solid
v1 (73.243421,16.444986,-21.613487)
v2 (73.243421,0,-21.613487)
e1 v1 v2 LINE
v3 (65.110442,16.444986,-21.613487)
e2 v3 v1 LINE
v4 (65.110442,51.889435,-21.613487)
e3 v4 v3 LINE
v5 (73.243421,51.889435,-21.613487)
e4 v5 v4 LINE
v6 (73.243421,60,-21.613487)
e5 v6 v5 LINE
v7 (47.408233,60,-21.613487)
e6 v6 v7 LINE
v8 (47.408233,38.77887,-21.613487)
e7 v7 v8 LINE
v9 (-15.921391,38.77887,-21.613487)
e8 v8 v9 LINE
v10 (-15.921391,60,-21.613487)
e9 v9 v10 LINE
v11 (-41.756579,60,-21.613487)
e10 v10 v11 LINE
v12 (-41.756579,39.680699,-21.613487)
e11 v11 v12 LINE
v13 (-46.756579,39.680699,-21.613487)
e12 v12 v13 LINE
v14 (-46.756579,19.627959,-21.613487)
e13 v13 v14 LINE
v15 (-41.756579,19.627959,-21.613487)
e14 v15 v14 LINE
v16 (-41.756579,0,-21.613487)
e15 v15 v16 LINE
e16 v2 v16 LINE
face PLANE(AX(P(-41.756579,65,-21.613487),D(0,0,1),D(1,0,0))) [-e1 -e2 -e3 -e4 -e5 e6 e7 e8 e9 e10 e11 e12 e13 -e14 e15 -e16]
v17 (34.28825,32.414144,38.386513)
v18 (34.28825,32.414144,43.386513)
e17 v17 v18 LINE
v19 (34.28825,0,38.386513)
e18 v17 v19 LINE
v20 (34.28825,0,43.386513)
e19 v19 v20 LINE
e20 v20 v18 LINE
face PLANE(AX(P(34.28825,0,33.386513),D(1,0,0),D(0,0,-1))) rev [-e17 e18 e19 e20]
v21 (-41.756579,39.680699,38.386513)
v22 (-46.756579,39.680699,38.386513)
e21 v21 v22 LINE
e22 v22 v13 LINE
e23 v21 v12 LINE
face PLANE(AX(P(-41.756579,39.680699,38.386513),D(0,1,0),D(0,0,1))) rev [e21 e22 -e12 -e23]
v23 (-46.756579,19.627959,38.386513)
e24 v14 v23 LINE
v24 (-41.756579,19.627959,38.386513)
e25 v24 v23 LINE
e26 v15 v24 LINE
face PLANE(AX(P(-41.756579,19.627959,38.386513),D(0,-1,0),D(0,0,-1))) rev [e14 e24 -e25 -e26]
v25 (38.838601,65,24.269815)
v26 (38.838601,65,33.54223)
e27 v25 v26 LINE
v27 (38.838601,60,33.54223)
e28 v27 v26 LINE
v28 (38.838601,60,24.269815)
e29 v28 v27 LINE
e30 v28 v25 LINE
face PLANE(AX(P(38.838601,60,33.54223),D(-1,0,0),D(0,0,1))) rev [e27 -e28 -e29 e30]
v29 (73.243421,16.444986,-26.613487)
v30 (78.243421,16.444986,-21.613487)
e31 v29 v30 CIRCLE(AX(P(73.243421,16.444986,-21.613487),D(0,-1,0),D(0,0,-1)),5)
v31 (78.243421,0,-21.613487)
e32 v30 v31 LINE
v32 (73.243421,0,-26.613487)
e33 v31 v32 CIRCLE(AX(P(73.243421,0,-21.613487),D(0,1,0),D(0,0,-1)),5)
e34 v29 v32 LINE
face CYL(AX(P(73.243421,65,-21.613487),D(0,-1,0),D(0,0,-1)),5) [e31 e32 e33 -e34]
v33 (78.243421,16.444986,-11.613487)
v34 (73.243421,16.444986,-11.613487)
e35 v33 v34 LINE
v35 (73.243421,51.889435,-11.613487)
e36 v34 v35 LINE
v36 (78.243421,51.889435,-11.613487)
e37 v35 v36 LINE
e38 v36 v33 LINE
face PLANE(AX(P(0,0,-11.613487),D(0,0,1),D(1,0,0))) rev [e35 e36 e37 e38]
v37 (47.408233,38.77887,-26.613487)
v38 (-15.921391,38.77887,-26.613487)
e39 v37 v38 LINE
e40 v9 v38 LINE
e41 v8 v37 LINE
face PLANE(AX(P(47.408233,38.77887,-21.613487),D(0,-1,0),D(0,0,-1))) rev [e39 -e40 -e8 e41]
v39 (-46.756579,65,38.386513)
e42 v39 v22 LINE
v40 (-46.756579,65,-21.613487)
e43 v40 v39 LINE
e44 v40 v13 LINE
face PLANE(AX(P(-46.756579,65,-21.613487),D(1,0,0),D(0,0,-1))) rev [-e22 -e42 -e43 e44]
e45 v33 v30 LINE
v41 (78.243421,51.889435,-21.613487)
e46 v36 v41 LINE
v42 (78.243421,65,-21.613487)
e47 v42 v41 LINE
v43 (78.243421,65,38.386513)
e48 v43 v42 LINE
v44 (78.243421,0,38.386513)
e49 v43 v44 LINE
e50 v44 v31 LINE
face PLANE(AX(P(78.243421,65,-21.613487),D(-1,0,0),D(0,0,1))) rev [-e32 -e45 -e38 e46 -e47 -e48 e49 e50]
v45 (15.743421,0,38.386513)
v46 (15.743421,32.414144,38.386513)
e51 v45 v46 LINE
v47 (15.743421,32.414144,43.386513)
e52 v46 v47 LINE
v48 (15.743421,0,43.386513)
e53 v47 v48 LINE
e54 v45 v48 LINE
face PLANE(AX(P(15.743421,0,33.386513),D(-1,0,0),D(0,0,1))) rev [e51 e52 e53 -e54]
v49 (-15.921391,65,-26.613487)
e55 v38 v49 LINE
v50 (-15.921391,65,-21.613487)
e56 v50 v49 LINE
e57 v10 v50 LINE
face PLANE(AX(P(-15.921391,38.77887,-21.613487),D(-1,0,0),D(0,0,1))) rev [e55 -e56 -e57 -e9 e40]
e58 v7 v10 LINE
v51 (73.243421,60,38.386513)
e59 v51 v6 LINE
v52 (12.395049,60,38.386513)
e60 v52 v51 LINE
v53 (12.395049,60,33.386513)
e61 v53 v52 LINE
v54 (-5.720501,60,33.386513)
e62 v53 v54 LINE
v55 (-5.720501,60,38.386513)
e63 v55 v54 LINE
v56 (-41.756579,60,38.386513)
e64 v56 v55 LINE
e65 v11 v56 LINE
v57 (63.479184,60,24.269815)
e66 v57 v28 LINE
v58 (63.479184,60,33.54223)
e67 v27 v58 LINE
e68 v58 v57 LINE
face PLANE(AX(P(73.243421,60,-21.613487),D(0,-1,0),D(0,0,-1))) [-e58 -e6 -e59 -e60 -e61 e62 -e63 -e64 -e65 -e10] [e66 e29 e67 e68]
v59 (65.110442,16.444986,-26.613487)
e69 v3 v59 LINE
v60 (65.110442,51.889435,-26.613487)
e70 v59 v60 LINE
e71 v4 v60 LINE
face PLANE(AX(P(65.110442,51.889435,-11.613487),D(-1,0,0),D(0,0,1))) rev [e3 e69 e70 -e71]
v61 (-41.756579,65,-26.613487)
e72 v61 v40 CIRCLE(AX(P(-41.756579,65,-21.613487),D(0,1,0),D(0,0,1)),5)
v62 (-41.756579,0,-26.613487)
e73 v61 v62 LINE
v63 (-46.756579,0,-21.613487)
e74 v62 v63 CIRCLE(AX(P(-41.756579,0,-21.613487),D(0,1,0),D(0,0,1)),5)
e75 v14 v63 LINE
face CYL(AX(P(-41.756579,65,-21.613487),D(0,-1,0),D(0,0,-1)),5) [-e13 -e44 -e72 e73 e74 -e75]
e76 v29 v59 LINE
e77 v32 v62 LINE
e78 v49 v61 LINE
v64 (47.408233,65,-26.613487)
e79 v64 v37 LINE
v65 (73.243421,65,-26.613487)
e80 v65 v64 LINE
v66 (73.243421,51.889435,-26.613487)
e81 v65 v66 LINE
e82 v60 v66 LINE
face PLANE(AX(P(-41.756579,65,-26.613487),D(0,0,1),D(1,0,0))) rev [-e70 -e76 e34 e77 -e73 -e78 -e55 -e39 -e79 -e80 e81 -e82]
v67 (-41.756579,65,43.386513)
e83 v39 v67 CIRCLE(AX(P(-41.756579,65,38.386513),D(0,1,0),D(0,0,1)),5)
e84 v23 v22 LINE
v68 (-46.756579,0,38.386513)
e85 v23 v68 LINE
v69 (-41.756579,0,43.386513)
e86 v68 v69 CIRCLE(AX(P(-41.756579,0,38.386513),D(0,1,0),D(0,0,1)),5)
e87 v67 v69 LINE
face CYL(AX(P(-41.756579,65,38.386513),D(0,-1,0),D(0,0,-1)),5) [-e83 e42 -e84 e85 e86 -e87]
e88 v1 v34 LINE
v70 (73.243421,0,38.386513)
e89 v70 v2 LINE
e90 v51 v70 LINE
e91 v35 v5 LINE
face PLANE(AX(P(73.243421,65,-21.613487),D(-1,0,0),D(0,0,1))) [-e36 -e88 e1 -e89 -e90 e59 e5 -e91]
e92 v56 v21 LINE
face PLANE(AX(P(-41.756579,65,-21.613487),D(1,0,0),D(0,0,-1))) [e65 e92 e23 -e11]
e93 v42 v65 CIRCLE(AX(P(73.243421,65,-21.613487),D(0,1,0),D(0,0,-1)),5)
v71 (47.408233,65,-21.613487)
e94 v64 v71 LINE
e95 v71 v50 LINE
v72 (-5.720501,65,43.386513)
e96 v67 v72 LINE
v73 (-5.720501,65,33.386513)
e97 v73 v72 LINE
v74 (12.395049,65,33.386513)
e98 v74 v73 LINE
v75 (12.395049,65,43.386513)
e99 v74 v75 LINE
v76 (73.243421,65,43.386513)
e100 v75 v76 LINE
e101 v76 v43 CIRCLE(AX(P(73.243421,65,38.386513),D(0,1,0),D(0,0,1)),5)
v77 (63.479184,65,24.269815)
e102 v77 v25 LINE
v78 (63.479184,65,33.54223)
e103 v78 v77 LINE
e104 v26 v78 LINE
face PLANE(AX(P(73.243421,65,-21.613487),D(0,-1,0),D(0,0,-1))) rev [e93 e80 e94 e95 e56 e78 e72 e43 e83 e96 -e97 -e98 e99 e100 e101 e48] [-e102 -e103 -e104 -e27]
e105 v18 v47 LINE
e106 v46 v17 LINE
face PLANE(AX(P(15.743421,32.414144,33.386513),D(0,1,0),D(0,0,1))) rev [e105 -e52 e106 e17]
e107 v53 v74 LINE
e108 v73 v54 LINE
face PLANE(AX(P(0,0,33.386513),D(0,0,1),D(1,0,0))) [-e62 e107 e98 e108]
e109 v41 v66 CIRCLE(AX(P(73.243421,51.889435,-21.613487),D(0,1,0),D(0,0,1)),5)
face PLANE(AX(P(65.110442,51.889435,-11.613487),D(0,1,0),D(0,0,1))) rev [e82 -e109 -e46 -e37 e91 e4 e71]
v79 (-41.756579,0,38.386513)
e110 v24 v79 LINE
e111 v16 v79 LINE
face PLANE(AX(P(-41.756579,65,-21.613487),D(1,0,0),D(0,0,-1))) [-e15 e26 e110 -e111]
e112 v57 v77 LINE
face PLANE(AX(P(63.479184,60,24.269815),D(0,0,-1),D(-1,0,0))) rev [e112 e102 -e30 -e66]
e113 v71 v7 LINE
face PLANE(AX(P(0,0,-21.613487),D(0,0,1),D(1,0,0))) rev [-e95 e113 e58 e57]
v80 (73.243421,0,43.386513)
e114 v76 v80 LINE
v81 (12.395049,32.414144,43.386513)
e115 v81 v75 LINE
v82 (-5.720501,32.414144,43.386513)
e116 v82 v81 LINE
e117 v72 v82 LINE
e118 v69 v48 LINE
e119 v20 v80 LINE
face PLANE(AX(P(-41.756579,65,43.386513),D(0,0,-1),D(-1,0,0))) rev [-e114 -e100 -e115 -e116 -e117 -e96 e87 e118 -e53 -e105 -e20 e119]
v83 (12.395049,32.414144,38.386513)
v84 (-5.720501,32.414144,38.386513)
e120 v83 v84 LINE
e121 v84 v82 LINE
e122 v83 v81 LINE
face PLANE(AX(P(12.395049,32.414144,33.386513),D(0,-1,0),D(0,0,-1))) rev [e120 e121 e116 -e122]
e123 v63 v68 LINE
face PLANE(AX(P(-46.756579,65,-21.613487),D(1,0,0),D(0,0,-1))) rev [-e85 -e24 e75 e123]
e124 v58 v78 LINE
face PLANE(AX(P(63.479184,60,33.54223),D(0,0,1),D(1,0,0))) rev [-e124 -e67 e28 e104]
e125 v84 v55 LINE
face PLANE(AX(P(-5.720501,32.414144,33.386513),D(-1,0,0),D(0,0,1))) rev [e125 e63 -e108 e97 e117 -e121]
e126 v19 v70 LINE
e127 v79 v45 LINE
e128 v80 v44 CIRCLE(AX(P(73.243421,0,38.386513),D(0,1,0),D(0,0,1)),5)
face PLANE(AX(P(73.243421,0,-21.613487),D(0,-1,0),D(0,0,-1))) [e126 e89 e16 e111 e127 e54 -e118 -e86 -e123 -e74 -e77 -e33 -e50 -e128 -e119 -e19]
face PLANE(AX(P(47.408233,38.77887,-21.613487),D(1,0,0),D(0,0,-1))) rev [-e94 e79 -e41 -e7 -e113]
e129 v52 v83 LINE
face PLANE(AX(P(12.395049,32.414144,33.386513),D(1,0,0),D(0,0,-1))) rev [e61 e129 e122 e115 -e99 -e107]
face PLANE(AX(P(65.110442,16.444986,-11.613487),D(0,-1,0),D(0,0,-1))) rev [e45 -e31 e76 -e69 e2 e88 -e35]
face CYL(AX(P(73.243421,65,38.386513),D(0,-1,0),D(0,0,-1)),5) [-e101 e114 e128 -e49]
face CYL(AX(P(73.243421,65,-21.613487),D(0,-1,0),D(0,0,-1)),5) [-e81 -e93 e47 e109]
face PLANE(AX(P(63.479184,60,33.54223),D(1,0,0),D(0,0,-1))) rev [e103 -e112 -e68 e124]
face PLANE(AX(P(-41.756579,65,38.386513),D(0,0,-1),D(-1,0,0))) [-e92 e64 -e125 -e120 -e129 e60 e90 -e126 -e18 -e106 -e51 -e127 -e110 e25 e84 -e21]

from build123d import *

# Parameters (mm, degrees)
EXTRUDE_5_DEPTH     = 65
SHELL_START         = -21.613486842
SHELL_8_OUTLINE_W   = 115
SHELL_8_OUTLINE_H   = 60
SHELL_8_DEPTH       = 60
SKETCH_7_W          = 18.544828657
SKETCH_7_H          = 32.414144312
CUT_EXTRUDE_1_DEPTH = 10
SKETCH_8_W          = 18.115550217
SKETCH_8_H          = 32.585855688
CUT_EXTRUDE_2_DEPTH = 10
SKETCH_9_W          = 63.329623263
SKETCH_9_H          = 52.442260972
CUT_EXTRUDE_3_DEPTH = 5
SKETCH_10_W         = 13.132979269
SKETCH_10_H         = 35.444448456
CUT_EXTRUDE_4_DEPTH = 15
SKETCH_11_W         = 60
SKETCH_11_H         = 20.052739579
CUT_EXTRUDE_5_DEPTH = 5
SKETCH_12_W         = 24.640582522
SKETCH_12_H         = 9.272414329
CUT_EXTRUDE_6_DEPTH = 5


# Read off the part's stored shape, not the designer's step: 抽壳8
with BuildPart() as part:
    # 草图1<7> → 凸台-拉伸5 (new body)
    with BuildSketch(Plane(origin=(0, 0, 0), x_dir=(1, 0, 0), z_dir=(0, 1, 0))):
        with BuildLine():
            Line((-41.756578947, 26.613486842), (73.243421053, 26.613486842))
            ThreePointArc((73.243421053, 26.613486842), (76.778954959, 25.149020748), (78.243421053, 21.613486842))
            Line((78.243421053, 21.613486842), (78.243421053, -38.386513158))
            ThreePointArc((78.243421053, -38.386513158), (76.778954959, -41.922047064), (73.243421053, -43.386513158))
            Line((73.243421053, -43.386513158), (-41.756578947, -43.386513158))
            ThreePointArc((-41.756578947, -43.386513158), (-45.292112853, -41.922047064), (-46.756578947, -38.386513158))
            Line((-46.756578947, -38.386513158), (-46.756578947, 21.613486842))
            ThreePointArc((-46.756578947, 21.613486842), (-45.292112853, 25.149020748), (-41.756578947, 26.613486842))
        make_face()
    extrude(amount=EXTRUDE_5_DEPTH)

    # 抽壳8 outline → 抽壳8 (cut)
    with BuildSketch(Plane.XY.offset(SHELL_START)):
        with Locations((15.743421053, 30)):
            Rectangle(SHELL_8_OUTLINE_W, SHELL_8_OUTLINE_H)
    extrude(amount=SHELL_8_DEPTH, mode=Mode.SUBTRACT)

    # 草图7 → 切除-拉伸1 (cut)
    with BuildSketch(Plane.XY.offset(43.386513158)):
        with Locations((25.015835382, 16.207072156)):
            Rectangle(SKETCH_7_W, SKETCH_7_H)
    extrude(amount=-CUT_EXTRUDE_1_DEPTH, mode=Mode.SUBTRACT)

    # 草图8 → 切除-拉伸2 (cut)
    with BuildSketch(Plane.XY.offset(43.386513158)):
        with Locations((3.337274103, 48.707072156)):
            Rectangle(SKETCH_8_W, SKETCH_8_H)
    extrude(amount=-CUT_EXTRUDE_2_DEPTH, mode=Mode.SUBTRACT)

    # 草图9 → 切除-拉伸3 (cut)
    with BuildSketch(Plane(origin=(0, 0, -26.613486842), x_dir=(-1, 0, 0), z_dir=(0, 0, -1))):
        with Locations((-15.743421053, 65)):
            Rectangle(SKETCH_9_W, SKETCH_9_H)
    extrude(amount=-CUT_EXTRUDE_3_DEPTH, mode=Mode.SUBTRACT)

    # 草图10 → 切除-拉伸4 (cut)
    with BuildSketch(Plane(origin=(0, 0, -26.613486842), x_dir=(-1, 0, 0), z_dir=(0, 0, -1))):
        with Locations((-71.676931419, 34.167210529)):
            Rectangle(SKETCH_10_W, SKETCH_10_H)
    extrude(amount=-CUT_EXTRUDE_4_DEPTH, mode=Mode.SUBTRACT)

    # 草图11 → 切除-拉伸5 (cut)
    with BuildSketch(Plane.ZY.offset(46.756578947)):
        with Locations((8.386513158, 29.654328955)):
            Rectangle(SKETCH_11_W, SKETCH_11_H)
    extrude(amount=-CUT_EXTRUDE_5_DEPTH, mode=Mode.SUBTRACT)

    # 草图12 → 切除-拉伸6 (cut)
    with BuildSketch(Plane(origin=(0, 65, 0), x_dir=(1, 0, 0), z_dir=(0, 1, 0))):
        with Locations((51.158892447, -28.906022645)):
            Rectangle(SKETCH_12_W, SKETCH_12_H)
    extrude(amount=-CUT_EXTRUDE_6_DEPTH, mode=Mode.SUBTRACT)


solid = part.part
